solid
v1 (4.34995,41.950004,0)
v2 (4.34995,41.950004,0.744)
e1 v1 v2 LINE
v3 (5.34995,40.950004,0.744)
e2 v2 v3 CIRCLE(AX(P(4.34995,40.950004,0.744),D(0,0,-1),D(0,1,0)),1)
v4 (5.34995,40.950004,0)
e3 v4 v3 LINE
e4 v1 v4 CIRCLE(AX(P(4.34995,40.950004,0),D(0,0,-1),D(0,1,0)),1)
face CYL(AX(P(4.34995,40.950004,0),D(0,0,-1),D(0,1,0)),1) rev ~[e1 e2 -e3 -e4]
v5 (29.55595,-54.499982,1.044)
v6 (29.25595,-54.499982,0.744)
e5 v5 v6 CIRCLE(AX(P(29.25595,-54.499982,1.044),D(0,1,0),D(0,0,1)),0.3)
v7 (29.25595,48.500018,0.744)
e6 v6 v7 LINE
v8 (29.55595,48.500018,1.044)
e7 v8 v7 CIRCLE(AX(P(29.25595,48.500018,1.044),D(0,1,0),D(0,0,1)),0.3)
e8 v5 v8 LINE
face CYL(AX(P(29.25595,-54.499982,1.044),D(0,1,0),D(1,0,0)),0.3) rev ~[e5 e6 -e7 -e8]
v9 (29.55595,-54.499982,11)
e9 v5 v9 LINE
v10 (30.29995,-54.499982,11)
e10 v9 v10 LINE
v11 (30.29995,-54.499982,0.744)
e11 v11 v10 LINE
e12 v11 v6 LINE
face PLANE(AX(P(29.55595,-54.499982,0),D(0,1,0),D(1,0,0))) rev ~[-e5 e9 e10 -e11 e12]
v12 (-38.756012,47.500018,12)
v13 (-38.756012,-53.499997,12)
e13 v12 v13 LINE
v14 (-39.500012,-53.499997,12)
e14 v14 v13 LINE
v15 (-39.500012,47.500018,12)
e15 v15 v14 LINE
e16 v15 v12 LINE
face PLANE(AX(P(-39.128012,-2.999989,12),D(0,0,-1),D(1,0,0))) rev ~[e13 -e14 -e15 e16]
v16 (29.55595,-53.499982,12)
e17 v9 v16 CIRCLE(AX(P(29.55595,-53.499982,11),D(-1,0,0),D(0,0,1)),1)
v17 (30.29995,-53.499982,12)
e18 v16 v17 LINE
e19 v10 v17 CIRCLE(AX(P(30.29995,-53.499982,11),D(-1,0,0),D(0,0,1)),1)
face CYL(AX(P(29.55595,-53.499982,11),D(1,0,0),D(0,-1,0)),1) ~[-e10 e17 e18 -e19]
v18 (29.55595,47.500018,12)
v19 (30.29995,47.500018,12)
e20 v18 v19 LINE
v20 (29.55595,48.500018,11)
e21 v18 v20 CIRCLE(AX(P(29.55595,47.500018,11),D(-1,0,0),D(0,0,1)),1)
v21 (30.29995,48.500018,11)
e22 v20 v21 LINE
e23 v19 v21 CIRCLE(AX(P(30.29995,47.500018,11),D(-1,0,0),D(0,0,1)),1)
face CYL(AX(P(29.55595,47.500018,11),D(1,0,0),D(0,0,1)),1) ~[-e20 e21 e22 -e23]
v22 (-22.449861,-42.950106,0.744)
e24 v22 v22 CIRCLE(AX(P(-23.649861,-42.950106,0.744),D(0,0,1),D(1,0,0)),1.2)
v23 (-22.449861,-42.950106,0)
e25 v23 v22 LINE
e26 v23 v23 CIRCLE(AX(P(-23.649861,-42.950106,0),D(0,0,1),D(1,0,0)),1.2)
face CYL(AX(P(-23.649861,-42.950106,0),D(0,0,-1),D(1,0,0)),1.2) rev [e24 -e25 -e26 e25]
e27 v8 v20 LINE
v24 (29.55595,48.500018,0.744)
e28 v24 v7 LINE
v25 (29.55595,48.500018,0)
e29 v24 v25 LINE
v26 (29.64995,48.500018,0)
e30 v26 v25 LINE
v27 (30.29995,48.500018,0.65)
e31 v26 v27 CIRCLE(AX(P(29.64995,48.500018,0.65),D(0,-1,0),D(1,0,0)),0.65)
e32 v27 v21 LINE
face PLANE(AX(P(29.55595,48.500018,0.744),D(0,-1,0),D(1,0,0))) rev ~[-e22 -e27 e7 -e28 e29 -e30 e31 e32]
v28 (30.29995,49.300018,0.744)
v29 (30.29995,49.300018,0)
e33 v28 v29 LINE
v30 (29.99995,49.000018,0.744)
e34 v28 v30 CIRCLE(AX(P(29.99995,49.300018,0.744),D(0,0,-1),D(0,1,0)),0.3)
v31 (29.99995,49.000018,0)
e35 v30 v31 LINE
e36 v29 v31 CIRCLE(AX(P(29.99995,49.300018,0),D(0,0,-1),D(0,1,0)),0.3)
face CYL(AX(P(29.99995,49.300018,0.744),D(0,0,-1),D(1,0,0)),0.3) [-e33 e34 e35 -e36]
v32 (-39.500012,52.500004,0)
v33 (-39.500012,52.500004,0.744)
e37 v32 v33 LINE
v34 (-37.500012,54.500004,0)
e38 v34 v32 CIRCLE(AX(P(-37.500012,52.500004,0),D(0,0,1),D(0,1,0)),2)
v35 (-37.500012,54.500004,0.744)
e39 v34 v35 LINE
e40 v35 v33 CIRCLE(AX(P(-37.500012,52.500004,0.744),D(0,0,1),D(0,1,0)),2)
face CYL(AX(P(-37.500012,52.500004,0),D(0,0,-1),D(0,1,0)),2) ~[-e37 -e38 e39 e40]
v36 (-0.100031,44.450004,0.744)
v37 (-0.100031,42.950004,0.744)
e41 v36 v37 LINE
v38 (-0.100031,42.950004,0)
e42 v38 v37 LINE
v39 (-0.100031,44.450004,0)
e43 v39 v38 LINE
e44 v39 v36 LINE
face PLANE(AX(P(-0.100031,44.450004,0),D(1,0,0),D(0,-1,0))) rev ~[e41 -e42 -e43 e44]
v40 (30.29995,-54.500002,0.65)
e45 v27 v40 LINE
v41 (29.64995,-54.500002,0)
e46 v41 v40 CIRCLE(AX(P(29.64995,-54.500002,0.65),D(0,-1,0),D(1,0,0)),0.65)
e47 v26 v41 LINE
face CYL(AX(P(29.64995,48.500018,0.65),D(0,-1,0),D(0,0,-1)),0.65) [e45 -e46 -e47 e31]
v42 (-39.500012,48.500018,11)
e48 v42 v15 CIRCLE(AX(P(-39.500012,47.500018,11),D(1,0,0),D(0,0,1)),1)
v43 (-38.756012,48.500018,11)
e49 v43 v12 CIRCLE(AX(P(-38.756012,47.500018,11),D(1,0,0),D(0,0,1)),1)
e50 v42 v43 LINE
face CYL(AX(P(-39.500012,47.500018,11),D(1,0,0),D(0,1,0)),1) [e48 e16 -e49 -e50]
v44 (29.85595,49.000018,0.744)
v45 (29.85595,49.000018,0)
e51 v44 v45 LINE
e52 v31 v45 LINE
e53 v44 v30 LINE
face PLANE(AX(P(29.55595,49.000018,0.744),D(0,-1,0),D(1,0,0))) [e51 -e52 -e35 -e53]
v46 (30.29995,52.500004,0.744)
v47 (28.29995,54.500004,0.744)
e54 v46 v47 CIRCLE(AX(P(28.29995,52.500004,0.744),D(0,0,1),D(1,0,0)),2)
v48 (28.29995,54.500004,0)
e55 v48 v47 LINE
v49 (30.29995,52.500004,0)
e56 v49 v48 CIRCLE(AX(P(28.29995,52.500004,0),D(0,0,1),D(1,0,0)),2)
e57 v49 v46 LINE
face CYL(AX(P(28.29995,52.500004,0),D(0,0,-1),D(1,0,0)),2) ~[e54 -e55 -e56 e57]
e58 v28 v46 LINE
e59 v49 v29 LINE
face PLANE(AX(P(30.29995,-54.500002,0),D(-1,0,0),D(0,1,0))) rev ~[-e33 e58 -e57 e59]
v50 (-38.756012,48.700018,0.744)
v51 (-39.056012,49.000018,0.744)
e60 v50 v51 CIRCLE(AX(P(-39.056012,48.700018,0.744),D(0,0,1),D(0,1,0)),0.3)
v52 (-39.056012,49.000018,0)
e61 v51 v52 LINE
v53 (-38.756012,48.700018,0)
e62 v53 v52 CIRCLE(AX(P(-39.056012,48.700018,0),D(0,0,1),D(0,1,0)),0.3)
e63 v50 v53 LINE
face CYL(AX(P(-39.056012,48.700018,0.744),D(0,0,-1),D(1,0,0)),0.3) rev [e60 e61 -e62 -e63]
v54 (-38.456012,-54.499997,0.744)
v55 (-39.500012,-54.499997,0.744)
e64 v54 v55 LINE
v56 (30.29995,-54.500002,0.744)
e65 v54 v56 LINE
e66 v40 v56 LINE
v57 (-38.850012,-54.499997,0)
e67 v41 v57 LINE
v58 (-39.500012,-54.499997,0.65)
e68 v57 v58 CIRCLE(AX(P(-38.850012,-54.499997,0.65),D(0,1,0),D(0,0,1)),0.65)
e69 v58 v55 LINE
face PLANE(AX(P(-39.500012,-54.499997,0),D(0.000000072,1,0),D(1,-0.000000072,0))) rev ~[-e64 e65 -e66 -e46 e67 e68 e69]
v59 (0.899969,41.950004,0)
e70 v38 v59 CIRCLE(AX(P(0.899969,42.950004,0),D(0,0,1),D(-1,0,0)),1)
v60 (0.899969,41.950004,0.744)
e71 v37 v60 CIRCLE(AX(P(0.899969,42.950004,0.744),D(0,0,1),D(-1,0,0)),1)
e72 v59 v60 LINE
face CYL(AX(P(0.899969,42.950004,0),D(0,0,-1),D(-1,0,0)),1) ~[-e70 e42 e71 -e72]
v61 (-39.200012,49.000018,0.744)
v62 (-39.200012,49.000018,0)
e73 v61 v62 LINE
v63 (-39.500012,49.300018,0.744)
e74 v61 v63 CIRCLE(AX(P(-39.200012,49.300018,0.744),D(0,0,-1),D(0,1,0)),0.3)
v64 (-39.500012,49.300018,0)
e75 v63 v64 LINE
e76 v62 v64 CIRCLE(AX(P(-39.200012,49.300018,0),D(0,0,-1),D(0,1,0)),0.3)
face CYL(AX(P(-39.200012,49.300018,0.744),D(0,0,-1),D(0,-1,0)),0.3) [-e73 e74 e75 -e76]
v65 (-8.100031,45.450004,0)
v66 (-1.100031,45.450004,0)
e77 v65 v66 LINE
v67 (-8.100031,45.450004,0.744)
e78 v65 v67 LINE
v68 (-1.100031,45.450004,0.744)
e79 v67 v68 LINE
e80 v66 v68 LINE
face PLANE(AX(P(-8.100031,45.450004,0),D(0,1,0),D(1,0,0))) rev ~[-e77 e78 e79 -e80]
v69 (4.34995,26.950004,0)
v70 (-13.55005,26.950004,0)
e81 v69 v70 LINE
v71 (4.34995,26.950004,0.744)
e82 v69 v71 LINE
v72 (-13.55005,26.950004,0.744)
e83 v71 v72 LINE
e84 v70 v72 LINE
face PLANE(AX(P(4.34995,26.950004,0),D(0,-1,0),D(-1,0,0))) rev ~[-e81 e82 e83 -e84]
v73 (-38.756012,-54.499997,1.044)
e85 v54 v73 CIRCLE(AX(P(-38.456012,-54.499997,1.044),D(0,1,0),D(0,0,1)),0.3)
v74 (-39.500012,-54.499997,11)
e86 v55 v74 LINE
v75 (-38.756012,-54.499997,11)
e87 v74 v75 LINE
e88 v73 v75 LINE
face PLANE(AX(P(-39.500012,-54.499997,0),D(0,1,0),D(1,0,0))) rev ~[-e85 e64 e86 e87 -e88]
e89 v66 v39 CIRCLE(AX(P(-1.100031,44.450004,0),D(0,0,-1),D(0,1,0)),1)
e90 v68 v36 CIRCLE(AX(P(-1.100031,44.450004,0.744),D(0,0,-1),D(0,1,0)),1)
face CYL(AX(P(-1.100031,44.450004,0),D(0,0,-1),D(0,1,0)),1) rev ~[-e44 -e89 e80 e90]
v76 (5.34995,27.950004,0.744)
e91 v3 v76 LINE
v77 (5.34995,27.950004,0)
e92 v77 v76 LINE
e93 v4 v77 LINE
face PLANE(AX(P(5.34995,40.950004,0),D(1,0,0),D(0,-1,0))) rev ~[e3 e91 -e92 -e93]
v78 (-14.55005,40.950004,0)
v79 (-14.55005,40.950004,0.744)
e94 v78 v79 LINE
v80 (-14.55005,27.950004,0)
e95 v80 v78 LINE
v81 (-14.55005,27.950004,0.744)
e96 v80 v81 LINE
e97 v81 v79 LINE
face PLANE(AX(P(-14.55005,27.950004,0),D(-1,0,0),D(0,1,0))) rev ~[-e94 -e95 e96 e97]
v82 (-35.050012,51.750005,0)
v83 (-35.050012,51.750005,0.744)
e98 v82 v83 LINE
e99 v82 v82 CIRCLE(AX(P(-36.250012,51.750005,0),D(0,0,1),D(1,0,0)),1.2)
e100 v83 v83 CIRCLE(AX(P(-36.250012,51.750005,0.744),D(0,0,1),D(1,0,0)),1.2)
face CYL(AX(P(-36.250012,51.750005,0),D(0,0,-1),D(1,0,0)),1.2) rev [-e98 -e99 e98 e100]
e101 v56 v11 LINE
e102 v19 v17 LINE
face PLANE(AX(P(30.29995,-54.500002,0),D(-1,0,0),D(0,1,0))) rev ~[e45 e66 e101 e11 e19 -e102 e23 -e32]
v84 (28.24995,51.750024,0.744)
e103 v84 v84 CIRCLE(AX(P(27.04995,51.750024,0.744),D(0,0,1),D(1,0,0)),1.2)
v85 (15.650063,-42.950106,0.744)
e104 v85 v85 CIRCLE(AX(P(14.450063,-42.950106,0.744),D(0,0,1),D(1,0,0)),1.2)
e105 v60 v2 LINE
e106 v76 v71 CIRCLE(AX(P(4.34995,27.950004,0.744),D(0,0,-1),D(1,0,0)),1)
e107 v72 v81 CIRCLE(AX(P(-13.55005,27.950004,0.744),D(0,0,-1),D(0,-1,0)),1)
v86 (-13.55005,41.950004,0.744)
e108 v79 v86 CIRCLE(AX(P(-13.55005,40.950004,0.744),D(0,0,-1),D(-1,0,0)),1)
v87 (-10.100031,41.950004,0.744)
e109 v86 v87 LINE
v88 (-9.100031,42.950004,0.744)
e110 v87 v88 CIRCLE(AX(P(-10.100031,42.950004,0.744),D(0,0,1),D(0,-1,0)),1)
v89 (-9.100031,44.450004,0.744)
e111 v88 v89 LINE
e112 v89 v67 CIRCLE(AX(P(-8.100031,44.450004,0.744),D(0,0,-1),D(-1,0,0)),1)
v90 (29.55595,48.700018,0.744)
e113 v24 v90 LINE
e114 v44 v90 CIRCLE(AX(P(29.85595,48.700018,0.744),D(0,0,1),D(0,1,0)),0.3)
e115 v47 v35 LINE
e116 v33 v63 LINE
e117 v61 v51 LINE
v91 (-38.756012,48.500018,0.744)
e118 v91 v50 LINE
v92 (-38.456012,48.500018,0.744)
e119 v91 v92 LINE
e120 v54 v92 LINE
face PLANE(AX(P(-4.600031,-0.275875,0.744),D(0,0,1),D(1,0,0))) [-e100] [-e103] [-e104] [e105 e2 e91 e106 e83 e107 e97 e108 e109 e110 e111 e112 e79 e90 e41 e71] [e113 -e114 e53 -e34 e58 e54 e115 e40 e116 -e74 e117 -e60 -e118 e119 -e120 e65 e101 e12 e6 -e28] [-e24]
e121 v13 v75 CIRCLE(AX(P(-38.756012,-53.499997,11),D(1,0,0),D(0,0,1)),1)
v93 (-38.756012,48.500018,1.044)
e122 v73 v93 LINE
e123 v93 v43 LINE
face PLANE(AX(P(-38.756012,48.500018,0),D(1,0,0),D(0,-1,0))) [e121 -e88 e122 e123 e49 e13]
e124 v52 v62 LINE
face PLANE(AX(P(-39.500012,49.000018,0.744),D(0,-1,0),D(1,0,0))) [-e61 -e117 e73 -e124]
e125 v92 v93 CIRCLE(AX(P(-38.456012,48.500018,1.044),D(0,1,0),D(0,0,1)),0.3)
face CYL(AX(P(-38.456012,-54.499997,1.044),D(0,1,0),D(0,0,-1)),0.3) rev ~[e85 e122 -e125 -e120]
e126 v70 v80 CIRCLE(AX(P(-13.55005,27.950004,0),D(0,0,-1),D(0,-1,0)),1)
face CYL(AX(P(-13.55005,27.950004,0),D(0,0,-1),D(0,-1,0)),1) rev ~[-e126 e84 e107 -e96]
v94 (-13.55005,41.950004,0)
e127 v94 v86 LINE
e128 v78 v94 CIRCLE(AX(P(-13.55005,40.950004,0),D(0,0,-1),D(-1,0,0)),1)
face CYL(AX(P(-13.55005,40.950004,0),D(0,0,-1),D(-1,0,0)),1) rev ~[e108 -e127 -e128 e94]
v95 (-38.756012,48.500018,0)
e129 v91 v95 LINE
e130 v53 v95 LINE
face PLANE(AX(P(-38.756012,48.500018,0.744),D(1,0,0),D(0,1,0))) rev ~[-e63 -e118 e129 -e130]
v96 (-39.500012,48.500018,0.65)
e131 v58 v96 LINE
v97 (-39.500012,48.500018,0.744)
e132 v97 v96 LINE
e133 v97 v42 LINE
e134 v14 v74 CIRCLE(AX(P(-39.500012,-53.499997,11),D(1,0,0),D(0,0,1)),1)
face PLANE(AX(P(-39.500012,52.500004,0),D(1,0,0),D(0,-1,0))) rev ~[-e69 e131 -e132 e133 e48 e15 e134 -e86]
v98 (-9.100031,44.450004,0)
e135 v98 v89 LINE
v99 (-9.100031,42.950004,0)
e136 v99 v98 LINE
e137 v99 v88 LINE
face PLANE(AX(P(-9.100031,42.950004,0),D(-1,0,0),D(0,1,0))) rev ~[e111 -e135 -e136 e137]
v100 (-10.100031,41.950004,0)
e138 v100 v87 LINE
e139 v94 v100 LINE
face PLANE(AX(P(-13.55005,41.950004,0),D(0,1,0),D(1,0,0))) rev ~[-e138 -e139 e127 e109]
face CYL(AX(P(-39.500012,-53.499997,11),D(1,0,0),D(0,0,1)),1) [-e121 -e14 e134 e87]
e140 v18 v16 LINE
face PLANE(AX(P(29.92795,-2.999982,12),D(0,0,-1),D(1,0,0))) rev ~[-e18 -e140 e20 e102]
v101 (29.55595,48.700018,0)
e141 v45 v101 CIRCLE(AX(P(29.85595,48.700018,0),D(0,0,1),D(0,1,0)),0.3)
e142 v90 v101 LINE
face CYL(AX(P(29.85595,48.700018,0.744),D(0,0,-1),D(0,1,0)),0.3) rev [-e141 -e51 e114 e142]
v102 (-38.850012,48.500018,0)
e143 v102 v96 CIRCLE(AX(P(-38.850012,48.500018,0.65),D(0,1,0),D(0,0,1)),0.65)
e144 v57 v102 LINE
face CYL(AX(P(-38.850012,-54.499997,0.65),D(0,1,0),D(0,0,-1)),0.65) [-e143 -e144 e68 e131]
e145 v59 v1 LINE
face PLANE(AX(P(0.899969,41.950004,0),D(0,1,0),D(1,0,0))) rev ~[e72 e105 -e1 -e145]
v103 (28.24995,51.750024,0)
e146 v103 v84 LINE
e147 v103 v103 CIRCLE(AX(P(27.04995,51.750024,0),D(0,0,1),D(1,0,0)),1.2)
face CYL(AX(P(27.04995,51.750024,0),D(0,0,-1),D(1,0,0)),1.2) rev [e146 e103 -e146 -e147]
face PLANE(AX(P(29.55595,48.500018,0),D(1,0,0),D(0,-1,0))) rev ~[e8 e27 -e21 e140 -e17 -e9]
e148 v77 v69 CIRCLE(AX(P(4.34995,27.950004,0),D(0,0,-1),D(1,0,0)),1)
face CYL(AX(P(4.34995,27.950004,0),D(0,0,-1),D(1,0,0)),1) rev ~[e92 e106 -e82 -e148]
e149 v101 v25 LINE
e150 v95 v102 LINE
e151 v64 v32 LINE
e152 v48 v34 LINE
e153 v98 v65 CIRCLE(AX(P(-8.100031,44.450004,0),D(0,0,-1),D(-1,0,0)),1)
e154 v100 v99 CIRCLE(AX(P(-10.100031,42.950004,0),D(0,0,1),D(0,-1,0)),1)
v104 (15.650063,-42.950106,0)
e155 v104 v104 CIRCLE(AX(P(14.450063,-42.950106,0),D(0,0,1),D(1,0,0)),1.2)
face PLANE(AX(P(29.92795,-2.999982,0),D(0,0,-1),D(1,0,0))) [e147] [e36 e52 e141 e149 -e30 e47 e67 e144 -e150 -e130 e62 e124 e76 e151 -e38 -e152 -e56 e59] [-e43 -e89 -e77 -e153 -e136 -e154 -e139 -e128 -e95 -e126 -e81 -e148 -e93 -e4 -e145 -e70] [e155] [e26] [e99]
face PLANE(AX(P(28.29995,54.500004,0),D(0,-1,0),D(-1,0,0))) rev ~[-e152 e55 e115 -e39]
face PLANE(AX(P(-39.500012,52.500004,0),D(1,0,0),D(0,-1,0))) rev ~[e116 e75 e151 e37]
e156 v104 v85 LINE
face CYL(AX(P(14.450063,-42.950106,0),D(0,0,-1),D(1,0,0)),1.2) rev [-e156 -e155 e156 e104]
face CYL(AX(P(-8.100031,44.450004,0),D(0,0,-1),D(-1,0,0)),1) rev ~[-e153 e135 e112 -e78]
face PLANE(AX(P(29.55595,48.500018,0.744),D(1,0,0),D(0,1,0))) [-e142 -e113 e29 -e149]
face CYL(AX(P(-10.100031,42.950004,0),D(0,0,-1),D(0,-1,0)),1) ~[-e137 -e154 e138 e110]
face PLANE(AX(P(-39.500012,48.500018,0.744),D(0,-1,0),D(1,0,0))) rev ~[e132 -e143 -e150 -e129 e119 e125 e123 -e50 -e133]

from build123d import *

# Parameters (mm, degrees)
F1_R     = 1.2
F2_DEPTH = 0.744
F3_W     = 0.744
F3_H     = 103
F3_H_2   = 103.0000144269
F4_DEPTH = 12
F5_R     = 1
F6_W     = 0.744
F6_H     = 0.5
F7_DEPTH = 25
F8_R     = 0.3
F9_R     = 0.65
F10_R    = 0.3


# Not quite as in the source:
# - ends of sketch curves that miss each other by under 0.0002 mm in the source are joined


with BuildPart() as f2:
    # F1 (on Top) → F2 (new body)
    with BuildSketch(Plane.XY):
        with BuildLine():
            Line((-39.500012, -54.4999965731), (30.29995, -54.5000015731))
            Line((30.29995, -54.5000015731), (30.29995, 52.5000044269))
            ThreePointArc((30.29995, 52.5000044269), (29.7141635624, 53.9142179893), (28.29995, 54.5000044269))
            Line((28.29995, 54.5000044269), (-37.500012, 54.5000044269))
            ThreePointArc((-37.500012, 54.5000044269), (-38.9142255624, 53.9142179893), (-39.500012, 52.5000044269))
            Line((-39.500012, 52.5000044269), (-39.500012, -54.4999965731))
        make_face()
        with Locations((-23.649861, -42.9501055731)):
            Circle(F1_R, mode=Mode.SUBTRACT)
        with Locations((14.450063, -42.9501055731)):
            Circle(F1_R, mode=Mode.SUBTRACT)
        with Locations((-36.250012, 51.7500052865)):
            Circle(F1_R, mode=Mode.SUBTRACT)
        with BuildLine():
            Line((0.899969, 41.9500044269), (4.34995, 41.9500044269))
            ThreePointArc((4.34995, 41.9500044269), (5.0570567812, 41.6571112081), (5.34995, 40.9500044269))
            Line((5.34995, 40.9500044269), (5.34995, 27.9500044269))
            ThreePointArc((5.34995, 27.9500044269), (5.0570567812, 27.2428976457), (4.34995, 26.9500044269))
            Line((4.34995, 26.9500044269), (-13.55005, 26.9500044269))
            ThreePointArc((-13.55005, 26.9500044269), (-14.2571567812, 27.2428976457), (-14.55005, 27.9500044269))
            Line((-14.55005, 27.9500044269), (-14.55005, 40.9500044269))
            ThreePointArc((-14.55005, 40.9500044269), (-14.2571567812, 41.6571112081), (-13.55005, 41.9500044269))
            Line((-13.55005, 41.9500044269), (-10.100031, 41.9500044269))
            ThreePointArc((-10.100031, 41.9500044269), (-9.3929242188, 42.2428976457), (-9.100031, 42.9500044269))
            Line((-9.100031, 42.9500044269), (-9.100031, 44.4500044269))
            ThreePointArc((-9.100031, 44.4500044269), (-8.8071377812, 45.1571112081), (-8.100031, 45.4500044269))
            Line((-8.100031, 45.4500044269), (-4.600031, 45.4500044269))
            Line((-4.600031, 45.4500044269), (-1.100031, 45.4500044269))
            ThreePointArc((-1.100031, 45.4500044269), (-0.3929242188, 45.1571112081), (-0.100031, 44.4500044269))
            Line((-0.100031, 44.4500044269), (-0.100031, 42.9500044269))
            ThreePointArc((-0.100031, 42.9500044269), (0.1928622188, 42.2428976457), (0.899969, 41.9500044269))
        make_face(mode=Mode.SUBTRACT)
        with Locations((27.04995, 51.750023553)):
            Circle(F1_R, mode=Mode.SUBTRACT)
    extrude(amount=F2_DEPTH)

    # F3 (on face) → F4 (join)
    with BuildSketch(Plane(origin=(0, 0, 0), x_dir=(1, 0, 0), z_dir=(0, 0, -1))):
        with Locations((29.92795, 2.9999821461)):
            Rectangle(F3_W, F3_H)
        with Locations((-39.128012, 2.9999893596)):
            Rectangle(F3_W, F3_H_2)
    extrude(amount=-F4_DEPTH)

    # F5
    f5_edges = [f2.edges().sort_by_distance(p)[0] for p in [
        (29.92795, -54.499982, 12),
        (29.92795, 48.500018, 12),
        (-39.128012, 48.500018, 12),
        (-39.128012, -54.499997, 12),
    ]]
    fillet(f5_edges, radius=F5_R)

    # F6 (on face) → F7 (cut)
    with BuildSketch(Plane.XY.offset(0.744)):
        with Locations((-39.128012, 48.7500178539)):
            Rectangle(F6_W, F6_H)
        with Locations((29.92795, 48.7500178539)):
            Rectangle(F6_W, F6_H)
    extrude(amount=-F7_DEPTH, mode=Mode.SUBTRACT)

    # F8
    f8_edges = [f2.edges().sort_by_distance(p)[0] for p in [
        (30.29995, 49.000018, 0.372),
        (29.55595, 49.000018, 0.372),
        (-39.500012, 49.000018, 0.372),
        (-38.756012, 49.000018, 0.372),
    ]]
    fillet(f8_edges, radius=F8_R)

    # F9
    f9_edges = [f2.edges().sort_by_distance(p)[0] for p in [
        (-39.500012, -2.999989, 0),
        (30.29995, -2.999992, 0),
    ]]
    fillet(f9_edges, radius=F9_R)

    # F10
    f10_edges = [f2.edges().sort_by_distance(p)[0] for p in [
        (-38.756012, -2.999989, 0.744),
        (29.55595, -2.999982, 0.744),
    ]]
    fillet(f10_edges, radius=F10_R)


solid = f2.part
